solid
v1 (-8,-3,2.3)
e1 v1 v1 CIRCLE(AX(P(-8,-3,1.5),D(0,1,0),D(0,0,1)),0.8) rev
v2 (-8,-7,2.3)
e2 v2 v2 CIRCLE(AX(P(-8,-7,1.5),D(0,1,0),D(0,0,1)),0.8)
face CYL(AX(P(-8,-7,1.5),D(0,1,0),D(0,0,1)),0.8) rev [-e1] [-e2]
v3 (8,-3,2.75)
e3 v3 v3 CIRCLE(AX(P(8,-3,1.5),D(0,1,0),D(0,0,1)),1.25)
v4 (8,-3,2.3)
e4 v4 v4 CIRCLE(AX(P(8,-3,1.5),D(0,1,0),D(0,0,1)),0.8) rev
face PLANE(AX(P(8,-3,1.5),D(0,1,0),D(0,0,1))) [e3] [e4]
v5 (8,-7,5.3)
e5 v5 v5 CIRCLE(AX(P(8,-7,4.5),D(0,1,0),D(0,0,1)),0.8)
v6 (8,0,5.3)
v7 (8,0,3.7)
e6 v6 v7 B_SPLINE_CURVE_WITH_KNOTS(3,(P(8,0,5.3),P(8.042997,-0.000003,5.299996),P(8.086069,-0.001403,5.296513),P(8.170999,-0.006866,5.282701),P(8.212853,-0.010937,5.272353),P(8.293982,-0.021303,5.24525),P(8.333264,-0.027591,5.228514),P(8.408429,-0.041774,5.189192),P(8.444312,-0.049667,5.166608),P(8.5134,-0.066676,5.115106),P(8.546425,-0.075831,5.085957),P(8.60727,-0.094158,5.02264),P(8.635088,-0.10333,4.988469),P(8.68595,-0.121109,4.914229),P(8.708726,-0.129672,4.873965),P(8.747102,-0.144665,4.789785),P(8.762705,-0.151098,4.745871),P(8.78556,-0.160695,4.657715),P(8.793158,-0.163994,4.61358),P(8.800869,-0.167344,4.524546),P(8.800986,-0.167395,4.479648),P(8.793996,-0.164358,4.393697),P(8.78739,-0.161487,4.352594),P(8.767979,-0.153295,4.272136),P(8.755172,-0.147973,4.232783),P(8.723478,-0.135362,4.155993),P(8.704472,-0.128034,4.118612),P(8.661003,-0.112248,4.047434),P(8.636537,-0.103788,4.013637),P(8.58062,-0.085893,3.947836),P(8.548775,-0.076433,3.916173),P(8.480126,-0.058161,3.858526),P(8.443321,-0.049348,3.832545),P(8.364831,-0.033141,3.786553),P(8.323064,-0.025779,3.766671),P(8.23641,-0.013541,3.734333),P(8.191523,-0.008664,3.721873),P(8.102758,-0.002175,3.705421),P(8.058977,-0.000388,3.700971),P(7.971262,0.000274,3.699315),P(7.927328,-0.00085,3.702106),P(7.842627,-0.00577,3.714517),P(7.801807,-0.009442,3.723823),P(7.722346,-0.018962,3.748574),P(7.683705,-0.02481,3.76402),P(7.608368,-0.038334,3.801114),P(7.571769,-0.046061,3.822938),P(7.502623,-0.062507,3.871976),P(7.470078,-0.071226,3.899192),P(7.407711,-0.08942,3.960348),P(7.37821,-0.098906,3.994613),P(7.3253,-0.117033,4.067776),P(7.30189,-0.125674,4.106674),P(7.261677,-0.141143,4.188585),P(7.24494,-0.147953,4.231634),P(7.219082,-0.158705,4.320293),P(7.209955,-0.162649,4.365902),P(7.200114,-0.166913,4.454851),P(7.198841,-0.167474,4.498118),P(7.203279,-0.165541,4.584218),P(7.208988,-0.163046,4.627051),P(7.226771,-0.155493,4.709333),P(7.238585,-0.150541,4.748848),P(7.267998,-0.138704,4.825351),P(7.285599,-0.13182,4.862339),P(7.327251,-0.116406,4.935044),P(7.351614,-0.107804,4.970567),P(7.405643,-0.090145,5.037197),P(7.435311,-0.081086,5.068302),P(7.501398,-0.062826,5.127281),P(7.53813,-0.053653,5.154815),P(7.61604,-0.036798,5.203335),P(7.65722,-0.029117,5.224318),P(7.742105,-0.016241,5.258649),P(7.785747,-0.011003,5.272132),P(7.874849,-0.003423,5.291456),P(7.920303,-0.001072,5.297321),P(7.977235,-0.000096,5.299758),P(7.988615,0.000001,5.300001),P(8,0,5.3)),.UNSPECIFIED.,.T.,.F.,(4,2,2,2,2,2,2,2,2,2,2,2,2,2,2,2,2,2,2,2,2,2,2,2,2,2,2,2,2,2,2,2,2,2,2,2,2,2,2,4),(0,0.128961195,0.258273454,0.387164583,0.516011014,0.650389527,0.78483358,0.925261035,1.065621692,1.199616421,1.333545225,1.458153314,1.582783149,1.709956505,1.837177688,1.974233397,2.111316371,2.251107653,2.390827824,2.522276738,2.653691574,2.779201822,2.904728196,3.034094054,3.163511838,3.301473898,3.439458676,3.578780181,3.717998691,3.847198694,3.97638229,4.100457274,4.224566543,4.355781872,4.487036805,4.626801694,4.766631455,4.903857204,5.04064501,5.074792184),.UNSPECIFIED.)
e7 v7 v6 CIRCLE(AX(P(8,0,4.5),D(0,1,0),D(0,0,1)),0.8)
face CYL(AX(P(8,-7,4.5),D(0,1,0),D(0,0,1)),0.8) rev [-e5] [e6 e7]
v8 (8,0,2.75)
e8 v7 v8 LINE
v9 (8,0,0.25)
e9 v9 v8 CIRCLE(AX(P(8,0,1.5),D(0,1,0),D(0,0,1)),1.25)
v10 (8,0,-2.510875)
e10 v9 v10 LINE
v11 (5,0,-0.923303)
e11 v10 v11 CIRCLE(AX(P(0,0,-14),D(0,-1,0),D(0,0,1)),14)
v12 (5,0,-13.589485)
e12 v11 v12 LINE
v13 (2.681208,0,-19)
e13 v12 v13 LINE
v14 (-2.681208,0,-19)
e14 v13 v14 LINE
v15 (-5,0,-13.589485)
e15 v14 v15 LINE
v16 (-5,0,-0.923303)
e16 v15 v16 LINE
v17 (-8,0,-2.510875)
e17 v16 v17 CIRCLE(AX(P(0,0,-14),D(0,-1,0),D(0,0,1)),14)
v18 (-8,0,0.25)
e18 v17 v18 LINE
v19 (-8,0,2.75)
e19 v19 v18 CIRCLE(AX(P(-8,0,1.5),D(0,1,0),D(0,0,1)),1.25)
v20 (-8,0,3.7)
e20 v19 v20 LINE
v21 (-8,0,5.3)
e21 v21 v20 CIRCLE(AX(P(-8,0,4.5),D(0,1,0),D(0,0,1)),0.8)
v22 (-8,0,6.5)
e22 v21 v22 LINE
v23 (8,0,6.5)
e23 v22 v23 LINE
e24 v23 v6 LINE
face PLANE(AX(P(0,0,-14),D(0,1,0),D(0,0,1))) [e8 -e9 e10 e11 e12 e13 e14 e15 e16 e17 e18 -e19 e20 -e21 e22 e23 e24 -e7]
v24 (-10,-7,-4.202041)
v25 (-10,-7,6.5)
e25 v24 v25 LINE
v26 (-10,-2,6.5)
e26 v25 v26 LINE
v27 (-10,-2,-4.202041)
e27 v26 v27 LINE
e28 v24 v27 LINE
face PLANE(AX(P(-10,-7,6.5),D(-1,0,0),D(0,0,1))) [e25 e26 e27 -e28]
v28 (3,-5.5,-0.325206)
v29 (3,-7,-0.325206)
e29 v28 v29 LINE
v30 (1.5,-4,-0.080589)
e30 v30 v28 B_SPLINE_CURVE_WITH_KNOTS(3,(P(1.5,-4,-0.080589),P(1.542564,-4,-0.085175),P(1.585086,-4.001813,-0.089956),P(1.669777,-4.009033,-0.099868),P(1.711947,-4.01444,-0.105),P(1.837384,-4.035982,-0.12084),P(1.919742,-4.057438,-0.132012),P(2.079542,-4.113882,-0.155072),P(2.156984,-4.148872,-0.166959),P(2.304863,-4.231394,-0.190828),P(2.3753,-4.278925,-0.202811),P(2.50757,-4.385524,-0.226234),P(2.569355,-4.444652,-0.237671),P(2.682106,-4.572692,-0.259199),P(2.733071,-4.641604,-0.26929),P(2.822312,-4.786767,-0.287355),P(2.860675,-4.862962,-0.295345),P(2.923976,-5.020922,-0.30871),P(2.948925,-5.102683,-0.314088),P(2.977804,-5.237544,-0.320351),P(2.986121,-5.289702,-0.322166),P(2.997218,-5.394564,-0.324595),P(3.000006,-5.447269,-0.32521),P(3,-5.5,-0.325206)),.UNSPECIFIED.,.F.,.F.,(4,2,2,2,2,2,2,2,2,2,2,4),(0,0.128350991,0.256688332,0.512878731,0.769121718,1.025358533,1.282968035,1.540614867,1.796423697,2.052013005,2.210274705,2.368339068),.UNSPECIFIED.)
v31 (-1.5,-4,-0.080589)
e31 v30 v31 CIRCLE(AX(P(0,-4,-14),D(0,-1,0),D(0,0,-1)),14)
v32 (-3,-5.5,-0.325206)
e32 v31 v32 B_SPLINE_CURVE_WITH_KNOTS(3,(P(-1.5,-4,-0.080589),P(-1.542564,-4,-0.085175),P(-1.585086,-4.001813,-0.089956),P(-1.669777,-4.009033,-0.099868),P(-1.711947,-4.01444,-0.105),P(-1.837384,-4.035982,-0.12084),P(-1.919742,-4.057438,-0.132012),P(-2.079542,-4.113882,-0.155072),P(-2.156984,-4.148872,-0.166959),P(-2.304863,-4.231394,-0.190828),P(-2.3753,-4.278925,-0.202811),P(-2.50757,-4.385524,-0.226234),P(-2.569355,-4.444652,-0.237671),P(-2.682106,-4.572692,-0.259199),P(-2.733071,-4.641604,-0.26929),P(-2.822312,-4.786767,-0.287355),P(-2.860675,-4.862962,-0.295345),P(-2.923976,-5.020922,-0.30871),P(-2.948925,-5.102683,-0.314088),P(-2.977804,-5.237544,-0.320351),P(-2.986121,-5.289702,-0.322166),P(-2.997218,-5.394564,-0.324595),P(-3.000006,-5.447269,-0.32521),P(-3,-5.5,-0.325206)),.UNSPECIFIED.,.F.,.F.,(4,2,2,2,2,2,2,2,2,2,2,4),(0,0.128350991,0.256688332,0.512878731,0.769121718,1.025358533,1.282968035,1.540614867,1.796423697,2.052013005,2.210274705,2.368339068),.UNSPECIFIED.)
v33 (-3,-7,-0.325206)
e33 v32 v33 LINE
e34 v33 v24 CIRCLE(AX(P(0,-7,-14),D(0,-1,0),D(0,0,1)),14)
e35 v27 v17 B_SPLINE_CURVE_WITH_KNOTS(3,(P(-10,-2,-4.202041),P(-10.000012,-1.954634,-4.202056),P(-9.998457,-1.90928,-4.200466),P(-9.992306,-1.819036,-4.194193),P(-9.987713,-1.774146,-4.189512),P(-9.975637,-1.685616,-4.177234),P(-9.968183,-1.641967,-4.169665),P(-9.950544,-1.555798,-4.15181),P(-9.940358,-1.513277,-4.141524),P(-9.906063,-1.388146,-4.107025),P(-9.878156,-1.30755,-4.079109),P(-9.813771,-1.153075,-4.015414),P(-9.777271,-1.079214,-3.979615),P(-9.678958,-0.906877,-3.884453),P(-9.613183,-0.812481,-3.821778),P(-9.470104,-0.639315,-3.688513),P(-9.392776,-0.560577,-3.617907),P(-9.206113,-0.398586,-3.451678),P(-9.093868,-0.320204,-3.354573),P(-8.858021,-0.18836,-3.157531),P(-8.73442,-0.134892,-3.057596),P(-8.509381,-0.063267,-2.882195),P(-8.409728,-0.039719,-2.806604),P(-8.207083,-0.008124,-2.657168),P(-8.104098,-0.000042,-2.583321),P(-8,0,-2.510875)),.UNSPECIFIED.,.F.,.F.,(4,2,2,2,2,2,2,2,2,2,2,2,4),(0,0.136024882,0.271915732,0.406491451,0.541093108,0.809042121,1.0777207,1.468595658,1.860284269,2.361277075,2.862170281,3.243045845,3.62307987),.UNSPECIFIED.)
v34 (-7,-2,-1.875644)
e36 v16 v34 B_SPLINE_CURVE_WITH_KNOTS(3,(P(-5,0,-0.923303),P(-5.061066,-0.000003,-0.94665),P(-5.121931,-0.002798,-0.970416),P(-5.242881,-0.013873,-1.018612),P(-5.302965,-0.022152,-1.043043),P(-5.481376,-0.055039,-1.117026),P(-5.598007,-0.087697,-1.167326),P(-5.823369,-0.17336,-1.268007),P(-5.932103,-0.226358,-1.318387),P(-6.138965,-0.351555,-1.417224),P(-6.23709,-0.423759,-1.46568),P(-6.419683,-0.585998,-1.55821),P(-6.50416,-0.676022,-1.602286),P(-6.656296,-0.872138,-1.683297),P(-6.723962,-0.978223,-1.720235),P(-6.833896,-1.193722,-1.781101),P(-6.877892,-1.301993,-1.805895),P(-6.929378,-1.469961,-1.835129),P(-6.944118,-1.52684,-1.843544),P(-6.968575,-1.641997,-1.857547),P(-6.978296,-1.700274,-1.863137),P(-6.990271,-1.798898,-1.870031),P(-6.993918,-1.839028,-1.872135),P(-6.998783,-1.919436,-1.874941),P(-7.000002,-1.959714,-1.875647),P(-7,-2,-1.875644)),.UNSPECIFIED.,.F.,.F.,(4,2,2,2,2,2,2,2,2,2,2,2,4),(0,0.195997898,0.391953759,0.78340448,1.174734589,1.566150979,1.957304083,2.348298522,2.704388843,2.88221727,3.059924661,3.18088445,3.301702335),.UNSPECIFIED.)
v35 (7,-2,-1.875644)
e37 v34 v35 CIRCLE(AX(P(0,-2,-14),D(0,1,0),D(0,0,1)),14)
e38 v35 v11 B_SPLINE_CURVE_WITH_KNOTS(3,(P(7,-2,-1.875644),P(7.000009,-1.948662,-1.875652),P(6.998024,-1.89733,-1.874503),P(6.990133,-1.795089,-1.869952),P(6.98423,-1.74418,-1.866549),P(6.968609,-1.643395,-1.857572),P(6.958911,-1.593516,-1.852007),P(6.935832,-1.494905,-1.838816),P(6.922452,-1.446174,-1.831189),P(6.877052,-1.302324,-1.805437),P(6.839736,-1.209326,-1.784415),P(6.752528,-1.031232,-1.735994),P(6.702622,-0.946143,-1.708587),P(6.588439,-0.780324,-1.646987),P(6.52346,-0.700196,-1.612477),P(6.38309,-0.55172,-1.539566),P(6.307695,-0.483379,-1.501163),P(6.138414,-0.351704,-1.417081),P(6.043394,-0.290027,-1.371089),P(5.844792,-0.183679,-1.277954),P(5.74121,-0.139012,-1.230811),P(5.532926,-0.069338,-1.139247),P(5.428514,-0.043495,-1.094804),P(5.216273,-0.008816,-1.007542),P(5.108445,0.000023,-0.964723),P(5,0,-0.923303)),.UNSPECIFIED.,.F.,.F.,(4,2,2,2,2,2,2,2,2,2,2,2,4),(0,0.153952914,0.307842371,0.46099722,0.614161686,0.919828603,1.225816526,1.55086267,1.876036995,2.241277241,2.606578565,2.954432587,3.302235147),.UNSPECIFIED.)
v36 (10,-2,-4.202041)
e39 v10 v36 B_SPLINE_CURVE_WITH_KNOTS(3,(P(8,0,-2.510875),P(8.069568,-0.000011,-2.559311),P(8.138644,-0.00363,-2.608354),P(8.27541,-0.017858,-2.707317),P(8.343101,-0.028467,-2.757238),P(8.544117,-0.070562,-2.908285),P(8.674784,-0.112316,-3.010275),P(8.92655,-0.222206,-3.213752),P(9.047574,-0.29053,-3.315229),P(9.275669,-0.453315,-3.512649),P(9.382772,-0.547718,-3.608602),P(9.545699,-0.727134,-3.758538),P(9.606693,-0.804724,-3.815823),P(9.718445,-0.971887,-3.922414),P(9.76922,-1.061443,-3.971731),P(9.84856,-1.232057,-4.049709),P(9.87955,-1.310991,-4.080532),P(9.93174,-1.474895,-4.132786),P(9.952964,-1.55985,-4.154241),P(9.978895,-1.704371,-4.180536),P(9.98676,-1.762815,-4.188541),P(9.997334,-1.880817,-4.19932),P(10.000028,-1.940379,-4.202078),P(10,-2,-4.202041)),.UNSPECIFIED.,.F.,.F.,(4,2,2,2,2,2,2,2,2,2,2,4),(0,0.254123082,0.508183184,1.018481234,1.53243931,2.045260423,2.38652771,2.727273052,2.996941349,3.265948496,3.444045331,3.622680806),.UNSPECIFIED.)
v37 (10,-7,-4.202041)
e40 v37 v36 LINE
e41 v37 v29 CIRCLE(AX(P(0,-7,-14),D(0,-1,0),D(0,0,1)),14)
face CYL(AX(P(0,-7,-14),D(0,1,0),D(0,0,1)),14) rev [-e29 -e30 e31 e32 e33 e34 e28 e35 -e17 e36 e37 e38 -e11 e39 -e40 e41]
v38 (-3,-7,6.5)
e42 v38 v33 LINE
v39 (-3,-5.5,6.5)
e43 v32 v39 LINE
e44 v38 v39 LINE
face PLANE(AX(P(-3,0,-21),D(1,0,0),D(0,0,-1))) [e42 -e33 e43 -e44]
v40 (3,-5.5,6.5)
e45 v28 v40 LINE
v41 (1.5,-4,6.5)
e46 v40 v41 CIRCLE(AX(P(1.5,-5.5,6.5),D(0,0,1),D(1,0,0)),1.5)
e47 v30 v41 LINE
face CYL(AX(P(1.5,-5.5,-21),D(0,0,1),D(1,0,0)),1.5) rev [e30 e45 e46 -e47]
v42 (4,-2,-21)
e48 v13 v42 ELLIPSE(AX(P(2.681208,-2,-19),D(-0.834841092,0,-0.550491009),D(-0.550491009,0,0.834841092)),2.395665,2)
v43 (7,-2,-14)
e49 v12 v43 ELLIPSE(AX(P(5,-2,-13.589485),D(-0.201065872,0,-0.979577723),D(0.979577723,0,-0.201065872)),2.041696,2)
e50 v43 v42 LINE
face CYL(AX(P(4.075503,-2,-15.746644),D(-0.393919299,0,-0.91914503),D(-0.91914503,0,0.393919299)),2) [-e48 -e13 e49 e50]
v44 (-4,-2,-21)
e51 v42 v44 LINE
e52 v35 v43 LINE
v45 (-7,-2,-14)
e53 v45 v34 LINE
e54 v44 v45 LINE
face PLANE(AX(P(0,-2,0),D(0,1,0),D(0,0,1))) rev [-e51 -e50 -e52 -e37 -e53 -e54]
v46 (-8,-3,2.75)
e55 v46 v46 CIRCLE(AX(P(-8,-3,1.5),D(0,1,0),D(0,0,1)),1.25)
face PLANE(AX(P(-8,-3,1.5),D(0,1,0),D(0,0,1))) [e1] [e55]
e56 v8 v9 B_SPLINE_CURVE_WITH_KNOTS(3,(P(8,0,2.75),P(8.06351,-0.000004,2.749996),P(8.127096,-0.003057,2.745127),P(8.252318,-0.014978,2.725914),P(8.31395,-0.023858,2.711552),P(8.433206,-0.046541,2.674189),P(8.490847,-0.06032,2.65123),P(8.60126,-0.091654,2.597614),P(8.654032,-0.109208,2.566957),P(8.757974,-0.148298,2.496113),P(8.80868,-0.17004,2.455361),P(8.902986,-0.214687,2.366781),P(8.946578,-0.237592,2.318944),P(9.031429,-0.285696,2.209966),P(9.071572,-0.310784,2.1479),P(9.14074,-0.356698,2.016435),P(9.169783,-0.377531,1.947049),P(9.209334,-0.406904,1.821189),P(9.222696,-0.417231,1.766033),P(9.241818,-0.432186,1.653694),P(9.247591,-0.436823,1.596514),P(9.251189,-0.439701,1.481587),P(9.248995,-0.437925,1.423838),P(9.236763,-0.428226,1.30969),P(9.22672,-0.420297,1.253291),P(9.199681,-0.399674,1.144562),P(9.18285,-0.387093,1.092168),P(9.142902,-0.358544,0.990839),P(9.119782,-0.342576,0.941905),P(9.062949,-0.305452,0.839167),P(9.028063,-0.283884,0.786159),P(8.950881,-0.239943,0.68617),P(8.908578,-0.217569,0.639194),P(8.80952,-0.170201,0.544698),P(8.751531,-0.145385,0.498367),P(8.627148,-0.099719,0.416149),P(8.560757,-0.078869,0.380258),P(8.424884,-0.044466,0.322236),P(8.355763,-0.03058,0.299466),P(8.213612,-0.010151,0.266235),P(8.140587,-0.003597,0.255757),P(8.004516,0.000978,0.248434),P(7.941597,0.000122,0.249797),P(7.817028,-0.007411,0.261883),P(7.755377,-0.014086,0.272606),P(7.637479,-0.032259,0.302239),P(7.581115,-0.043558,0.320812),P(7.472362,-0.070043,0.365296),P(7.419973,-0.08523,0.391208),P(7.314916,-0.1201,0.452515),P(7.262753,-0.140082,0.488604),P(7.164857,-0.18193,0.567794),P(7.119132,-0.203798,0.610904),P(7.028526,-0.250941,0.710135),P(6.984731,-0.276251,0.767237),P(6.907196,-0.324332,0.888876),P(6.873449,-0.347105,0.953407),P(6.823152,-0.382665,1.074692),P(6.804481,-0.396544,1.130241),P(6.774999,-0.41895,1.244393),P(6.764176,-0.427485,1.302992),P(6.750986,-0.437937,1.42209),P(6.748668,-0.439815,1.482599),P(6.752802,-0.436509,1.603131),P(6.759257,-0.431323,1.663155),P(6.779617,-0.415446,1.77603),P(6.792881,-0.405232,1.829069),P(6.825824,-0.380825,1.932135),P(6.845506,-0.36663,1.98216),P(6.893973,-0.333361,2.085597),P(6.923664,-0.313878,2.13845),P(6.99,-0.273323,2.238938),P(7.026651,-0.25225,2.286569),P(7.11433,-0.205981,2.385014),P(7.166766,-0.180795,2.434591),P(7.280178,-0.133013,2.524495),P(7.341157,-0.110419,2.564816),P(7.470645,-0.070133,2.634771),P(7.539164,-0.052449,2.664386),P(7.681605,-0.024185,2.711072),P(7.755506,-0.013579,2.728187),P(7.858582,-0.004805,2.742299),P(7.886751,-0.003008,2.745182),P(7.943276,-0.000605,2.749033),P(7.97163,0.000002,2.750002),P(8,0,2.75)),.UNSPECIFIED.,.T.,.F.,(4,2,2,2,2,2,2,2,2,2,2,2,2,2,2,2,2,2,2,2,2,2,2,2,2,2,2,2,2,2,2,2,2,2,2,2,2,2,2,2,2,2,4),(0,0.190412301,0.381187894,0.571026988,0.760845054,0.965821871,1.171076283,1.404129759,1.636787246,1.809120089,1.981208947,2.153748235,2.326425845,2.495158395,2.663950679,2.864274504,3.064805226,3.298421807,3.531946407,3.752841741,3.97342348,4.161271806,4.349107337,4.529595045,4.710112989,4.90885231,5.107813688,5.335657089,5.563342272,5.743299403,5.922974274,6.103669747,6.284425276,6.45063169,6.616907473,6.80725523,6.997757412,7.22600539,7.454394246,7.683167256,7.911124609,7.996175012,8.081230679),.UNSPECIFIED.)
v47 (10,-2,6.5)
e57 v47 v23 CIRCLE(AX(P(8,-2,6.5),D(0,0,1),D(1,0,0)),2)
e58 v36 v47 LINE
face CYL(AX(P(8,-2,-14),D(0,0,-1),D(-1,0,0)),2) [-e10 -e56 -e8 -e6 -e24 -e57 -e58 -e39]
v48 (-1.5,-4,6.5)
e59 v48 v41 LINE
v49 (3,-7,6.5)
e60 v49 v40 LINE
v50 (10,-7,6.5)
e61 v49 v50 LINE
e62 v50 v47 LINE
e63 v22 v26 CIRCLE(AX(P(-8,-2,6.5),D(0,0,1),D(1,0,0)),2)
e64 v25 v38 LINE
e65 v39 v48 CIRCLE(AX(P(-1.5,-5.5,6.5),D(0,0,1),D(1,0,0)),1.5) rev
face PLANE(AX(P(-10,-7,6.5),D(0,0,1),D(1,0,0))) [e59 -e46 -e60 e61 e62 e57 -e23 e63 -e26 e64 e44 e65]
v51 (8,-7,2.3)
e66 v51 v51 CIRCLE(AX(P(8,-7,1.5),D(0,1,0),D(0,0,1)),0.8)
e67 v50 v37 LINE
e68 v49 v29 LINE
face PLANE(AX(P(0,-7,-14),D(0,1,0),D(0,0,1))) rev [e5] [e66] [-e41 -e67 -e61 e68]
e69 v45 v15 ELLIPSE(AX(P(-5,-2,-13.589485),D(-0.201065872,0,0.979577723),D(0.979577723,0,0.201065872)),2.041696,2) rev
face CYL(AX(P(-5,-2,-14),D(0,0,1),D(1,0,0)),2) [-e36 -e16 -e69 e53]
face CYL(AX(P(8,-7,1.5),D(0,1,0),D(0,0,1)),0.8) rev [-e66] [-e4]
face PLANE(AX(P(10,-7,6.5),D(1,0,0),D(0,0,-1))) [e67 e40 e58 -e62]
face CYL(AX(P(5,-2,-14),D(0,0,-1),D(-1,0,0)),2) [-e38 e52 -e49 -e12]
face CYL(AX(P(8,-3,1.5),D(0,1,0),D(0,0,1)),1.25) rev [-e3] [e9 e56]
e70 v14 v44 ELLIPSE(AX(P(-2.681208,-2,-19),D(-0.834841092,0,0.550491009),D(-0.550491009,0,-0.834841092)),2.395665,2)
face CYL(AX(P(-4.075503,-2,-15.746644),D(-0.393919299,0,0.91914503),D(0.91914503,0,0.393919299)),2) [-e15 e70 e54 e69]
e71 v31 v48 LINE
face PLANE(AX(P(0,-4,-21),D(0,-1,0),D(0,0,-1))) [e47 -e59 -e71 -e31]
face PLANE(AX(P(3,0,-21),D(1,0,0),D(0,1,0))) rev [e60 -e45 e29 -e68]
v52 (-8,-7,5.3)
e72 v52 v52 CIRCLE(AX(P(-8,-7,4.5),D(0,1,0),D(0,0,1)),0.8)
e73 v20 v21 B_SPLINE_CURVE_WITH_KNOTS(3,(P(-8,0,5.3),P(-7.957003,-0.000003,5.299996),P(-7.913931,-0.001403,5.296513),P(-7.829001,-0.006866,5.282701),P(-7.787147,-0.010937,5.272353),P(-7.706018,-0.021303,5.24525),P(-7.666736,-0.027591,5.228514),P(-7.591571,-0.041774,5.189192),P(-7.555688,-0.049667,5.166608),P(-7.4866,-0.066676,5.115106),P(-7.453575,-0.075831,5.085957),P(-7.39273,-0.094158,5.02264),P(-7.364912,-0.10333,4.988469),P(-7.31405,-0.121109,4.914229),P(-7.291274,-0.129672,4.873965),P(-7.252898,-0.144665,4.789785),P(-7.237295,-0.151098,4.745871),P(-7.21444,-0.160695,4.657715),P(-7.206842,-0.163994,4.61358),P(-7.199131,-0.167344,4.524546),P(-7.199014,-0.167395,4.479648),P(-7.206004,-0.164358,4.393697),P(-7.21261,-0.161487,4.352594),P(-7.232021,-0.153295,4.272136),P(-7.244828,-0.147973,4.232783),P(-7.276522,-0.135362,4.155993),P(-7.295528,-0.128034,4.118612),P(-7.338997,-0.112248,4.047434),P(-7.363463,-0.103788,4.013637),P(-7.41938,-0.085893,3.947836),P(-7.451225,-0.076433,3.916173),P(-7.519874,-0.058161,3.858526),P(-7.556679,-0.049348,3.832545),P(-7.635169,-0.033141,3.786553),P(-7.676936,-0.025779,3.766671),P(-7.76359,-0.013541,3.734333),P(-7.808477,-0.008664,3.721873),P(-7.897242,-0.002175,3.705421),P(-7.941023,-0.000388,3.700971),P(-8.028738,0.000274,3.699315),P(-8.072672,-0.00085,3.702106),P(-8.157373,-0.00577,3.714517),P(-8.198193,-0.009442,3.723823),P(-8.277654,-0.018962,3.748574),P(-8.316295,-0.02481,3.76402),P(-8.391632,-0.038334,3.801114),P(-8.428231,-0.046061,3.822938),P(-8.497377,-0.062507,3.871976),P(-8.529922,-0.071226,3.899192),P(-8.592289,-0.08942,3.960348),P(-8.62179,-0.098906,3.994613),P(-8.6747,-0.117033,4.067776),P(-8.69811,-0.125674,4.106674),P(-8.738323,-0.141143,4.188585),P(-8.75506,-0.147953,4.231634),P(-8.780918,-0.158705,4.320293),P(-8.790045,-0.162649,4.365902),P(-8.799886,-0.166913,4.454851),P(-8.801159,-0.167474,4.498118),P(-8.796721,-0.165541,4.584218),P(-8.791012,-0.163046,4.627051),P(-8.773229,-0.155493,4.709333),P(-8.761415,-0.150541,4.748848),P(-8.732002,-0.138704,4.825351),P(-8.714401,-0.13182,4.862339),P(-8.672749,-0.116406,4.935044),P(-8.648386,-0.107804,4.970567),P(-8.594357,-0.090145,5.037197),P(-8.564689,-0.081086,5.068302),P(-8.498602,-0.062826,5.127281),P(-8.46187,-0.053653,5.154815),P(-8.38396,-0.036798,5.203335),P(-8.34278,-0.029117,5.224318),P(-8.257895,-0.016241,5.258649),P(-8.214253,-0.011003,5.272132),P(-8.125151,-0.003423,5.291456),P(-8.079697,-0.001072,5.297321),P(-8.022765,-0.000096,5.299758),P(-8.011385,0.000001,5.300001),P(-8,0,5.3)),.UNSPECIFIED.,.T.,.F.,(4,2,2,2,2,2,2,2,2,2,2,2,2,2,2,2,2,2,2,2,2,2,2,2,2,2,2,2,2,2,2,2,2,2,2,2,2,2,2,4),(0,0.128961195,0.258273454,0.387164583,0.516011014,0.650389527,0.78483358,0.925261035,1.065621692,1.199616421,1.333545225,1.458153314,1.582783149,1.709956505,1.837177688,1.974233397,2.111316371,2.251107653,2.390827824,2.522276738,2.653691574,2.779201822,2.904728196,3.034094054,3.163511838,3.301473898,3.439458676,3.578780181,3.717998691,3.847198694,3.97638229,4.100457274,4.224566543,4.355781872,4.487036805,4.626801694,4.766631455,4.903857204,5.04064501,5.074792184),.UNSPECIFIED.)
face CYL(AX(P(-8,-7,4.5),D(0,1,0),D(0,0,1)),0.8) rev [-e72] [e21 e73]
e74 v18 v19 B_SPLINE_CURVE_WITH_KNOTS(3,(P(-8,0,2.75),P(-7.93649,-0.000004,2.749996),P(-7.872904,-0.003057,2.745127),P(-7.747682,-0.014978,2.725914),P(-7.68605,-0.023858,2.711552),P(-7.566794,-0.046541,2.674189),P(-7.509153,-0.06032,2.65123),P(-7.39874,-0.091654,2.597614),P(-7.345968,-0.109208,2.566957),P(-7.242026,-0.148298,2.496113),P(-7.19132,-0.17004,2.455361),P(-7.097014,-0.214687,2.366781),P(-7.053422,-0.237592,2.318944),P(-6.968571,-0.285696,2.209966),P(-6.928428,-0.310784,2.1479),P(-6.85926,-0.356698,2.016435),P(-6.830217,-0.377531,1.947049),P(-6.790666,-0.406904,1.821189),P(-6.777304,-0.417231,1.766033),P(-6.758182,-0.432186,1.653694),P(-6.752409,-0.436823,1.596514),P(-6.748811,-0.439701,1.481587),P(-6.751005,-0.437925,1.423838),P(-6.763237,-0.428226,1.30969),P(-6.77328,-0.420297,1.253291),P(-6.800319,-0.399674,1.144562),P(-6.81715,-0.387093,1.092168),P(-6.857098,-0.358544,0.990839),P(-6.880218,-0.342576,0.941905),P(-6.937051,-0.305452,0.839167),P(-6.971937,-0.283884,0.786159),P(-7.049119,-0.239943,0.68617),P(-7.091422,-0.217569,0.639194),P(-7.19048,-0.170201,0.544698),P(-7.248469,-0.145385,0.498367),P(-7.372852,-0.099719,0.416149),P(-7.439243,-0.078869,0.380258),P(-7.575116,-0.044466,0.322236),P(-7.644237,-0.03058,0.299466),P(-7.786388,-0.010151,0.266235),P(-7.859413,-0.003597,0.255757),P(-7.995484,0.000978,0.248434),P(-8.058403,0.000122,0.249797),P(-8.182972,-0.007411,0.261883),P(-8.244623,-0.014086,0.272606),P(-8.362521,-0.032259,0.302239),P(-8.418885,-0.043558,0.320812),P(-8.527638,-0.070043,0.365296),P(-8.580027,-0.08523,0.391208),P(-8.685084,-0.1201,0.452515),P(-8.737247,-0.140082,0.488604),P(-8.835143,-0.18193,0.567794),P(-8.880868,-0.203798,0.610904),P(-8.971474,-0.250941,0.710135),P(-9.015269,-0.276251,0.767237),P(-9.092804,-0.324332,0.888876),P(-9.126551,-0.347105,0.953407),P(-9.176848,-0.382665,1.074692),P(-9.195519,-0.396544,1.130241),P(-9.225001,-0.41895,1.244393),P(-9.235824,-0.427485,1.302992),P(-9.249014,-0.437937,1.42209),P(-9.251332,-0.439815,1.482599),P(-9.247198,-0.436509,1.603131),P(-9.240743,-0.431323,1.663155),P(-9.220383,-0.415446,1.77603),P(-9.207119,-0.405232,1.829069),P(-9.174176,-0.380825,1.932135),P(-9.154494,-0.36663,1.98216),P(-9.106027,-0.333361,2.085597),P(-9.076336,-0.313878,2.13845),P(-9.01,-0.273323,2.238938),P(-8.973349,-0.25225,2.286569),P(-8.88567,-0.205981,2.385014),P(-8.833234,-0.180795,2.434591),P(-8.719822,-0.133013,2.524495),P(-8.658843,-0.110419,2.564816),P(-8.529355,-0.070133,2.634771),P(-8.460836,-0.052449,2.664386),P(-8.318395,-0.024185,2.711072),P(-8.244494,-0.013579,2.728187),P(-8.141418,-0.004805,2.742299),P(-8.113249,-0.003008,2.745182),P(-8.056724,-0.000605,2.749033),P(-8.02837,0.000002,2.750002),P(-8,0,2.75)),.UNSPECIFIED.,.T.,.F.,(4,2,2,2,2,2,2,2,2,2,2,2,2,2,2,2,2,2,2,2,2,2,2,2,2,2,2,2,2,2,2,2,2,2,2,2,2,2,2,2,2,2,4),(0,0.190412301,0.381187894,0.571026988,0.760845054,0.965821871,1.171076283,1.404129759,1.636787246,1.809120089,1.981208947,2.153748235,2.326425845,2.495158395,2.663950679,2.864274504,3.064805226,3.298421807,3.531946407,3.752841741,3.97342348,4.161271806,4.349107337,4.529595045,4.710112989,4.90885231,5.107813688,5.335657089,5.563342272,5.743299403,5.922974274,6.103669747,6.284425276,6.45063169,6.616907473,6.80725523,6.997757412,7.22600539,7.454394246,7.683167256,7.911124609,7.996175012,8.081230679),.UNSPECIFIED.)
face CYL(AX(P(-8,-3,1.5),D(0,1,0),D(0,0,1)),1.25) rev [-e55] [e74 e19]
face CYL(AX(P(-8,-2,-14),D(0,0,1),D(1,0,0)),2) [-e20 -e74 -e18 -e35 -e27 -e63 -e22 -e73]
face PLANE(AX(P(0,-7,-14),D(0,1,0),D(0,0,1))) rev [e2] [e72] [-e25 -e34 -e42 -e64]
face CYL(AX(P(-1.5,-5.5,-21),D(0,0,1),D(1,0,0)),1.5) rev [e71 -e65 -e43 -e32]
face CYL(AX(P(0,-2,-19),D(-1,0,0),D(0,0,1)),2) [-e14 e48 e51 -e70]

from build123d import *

# Parameters (mm, degrees)
BOSS_EXTRUDE1_DEPTH = 7
BOSS_EXTRUDE2_DEPTH = 2
CUT_EXTRUDE1_START  = 6.5
CUT_EXTRUDE1_DEPTH  = 31.789915603
FILLET1_R           = 2
SKETCH2_R           = 0.8
SCREW_HOLES_DEPTH   = 25.289915673
SKETCH4_R           = 1.25
SCREW_HEADS_DEPTH   = 3


with BuildPart() as part:
    # Sketch5 → Boss-Extrude1 (new body)
    with BuildSketch(Plane(origin=(0, 0, 0), x_dir=(1, 0, 0), z_dir=(0, 1, 0))):
        with BuildLine():
            Line((-10, -6.5), (10, -6.5))
            Line((10, -6.5), (10, 4.202041029))
            ThreePointArc((10, 4.202041029), (0, 0), (-10, 4.202041029))
            Line((-10, 4.202041029), (-10, -6.5))
        make_face()
    extrude(amount=-BOSS_EXTRUDE1_DEPTH)

    # Sketch6 → Boss-Extrude2 (add)
    with BuildSketch(Plane(origin=(0, 0, 0), x_dir=(1, 0, 0), z_dir=(0, 1, 0))):
        Polygon((-7, 14), (-7, 0), (7, 0), (7, 14), (4, 21), (0, 21), (-4, 21), align=None)
    extrude(amount=-BOSS_EXTRUDE2_DEPTH)

    # Sketch3 → Cut-Extrude1 (cut, through all)
    with BuildSketch(Plane.XY.offset(CUT_EXTRUDE1_START)):
        with BuildLine():
            Line((3, -7), (3, -5.5))
            ThreePointArc((3, -5.5), (2.560660172, -4.439339828), (1.5, -4))
            Line((1.5, -4), (-1.5, -4))
            ThreePointArc((-1.5, -4), (-2.560660172, -4.439339828), (-3, -5.5))
            Line((-3, -5.5), (-3, -7))
            Line((-3, -7), (0, -7))
            Line((0, -7), (3, -7))
        make_face()
    extrude(amount=-CUT_EXTRUDE1_DEPTH, mode=Mode.SUBTRACT)

    # Fillet1
    fillet1_edges = [part.edges().sort_by_distance(p)[0] for p in [
        (10, 0, 1.148979486),
        (-10, 0, 1.148979486),
        (7, 0, -7.937822174),
        (-7, 0, -7.937822174),
        (0, 0, -21),
        (-5.5, 0, -17.5),
        (5.5, 0, -17.5),
    ]]
    fillet(fillet1_edges, radius=FILLET1_R - 0.0001)  # a hair under: the kernel refuses the full size

    # Sketch2 → Screw Holes (cut, through all)
    with BuildSketch(Plane(origin=(0, 0, 0), x_dir=(1, 0, 0), z_dir=(0, 1, 0))):
        with Locations(Location((-8, -1.5, 0), (0, 0, 270))):
            Circle(SKETCH2_R)
        with Locations(Location((8, -1.5, 0), (0, 0, 270))):
            Circle(SKETCH2_R)
        with Locations(Location((8, -4.5, 0), (0, 0, 270))):
            Circle(SKETCH2_R)
        with Locations(Location((-8, -4.5, 0), (0, 0, 270))):
            Circle(SKETCH2_R)
    extrude(amount=-SCREW_HOLES_DEPTH, mode=Mode.SUBTRACT)

    # Sketch4 → Screw Heads (cut)
    with BuildSketch(Plane(origin=(0, 0, 0), x_dir=(1, 0, 0), z_dir=(0, 1, 0))):
        with Locations(Location((-8, -1.5, 0), (0, 0, 270))):
            Circle(SKETCH4_R)
        with Locations(Location((8, -1.5, 0), (0, 0, 270))):
            Circle(SKETCH4_R)
    extrude(amount=-SCREW_HEADS_DEPTH, mode=Mode.SUBTRACT)


solid = part.part
